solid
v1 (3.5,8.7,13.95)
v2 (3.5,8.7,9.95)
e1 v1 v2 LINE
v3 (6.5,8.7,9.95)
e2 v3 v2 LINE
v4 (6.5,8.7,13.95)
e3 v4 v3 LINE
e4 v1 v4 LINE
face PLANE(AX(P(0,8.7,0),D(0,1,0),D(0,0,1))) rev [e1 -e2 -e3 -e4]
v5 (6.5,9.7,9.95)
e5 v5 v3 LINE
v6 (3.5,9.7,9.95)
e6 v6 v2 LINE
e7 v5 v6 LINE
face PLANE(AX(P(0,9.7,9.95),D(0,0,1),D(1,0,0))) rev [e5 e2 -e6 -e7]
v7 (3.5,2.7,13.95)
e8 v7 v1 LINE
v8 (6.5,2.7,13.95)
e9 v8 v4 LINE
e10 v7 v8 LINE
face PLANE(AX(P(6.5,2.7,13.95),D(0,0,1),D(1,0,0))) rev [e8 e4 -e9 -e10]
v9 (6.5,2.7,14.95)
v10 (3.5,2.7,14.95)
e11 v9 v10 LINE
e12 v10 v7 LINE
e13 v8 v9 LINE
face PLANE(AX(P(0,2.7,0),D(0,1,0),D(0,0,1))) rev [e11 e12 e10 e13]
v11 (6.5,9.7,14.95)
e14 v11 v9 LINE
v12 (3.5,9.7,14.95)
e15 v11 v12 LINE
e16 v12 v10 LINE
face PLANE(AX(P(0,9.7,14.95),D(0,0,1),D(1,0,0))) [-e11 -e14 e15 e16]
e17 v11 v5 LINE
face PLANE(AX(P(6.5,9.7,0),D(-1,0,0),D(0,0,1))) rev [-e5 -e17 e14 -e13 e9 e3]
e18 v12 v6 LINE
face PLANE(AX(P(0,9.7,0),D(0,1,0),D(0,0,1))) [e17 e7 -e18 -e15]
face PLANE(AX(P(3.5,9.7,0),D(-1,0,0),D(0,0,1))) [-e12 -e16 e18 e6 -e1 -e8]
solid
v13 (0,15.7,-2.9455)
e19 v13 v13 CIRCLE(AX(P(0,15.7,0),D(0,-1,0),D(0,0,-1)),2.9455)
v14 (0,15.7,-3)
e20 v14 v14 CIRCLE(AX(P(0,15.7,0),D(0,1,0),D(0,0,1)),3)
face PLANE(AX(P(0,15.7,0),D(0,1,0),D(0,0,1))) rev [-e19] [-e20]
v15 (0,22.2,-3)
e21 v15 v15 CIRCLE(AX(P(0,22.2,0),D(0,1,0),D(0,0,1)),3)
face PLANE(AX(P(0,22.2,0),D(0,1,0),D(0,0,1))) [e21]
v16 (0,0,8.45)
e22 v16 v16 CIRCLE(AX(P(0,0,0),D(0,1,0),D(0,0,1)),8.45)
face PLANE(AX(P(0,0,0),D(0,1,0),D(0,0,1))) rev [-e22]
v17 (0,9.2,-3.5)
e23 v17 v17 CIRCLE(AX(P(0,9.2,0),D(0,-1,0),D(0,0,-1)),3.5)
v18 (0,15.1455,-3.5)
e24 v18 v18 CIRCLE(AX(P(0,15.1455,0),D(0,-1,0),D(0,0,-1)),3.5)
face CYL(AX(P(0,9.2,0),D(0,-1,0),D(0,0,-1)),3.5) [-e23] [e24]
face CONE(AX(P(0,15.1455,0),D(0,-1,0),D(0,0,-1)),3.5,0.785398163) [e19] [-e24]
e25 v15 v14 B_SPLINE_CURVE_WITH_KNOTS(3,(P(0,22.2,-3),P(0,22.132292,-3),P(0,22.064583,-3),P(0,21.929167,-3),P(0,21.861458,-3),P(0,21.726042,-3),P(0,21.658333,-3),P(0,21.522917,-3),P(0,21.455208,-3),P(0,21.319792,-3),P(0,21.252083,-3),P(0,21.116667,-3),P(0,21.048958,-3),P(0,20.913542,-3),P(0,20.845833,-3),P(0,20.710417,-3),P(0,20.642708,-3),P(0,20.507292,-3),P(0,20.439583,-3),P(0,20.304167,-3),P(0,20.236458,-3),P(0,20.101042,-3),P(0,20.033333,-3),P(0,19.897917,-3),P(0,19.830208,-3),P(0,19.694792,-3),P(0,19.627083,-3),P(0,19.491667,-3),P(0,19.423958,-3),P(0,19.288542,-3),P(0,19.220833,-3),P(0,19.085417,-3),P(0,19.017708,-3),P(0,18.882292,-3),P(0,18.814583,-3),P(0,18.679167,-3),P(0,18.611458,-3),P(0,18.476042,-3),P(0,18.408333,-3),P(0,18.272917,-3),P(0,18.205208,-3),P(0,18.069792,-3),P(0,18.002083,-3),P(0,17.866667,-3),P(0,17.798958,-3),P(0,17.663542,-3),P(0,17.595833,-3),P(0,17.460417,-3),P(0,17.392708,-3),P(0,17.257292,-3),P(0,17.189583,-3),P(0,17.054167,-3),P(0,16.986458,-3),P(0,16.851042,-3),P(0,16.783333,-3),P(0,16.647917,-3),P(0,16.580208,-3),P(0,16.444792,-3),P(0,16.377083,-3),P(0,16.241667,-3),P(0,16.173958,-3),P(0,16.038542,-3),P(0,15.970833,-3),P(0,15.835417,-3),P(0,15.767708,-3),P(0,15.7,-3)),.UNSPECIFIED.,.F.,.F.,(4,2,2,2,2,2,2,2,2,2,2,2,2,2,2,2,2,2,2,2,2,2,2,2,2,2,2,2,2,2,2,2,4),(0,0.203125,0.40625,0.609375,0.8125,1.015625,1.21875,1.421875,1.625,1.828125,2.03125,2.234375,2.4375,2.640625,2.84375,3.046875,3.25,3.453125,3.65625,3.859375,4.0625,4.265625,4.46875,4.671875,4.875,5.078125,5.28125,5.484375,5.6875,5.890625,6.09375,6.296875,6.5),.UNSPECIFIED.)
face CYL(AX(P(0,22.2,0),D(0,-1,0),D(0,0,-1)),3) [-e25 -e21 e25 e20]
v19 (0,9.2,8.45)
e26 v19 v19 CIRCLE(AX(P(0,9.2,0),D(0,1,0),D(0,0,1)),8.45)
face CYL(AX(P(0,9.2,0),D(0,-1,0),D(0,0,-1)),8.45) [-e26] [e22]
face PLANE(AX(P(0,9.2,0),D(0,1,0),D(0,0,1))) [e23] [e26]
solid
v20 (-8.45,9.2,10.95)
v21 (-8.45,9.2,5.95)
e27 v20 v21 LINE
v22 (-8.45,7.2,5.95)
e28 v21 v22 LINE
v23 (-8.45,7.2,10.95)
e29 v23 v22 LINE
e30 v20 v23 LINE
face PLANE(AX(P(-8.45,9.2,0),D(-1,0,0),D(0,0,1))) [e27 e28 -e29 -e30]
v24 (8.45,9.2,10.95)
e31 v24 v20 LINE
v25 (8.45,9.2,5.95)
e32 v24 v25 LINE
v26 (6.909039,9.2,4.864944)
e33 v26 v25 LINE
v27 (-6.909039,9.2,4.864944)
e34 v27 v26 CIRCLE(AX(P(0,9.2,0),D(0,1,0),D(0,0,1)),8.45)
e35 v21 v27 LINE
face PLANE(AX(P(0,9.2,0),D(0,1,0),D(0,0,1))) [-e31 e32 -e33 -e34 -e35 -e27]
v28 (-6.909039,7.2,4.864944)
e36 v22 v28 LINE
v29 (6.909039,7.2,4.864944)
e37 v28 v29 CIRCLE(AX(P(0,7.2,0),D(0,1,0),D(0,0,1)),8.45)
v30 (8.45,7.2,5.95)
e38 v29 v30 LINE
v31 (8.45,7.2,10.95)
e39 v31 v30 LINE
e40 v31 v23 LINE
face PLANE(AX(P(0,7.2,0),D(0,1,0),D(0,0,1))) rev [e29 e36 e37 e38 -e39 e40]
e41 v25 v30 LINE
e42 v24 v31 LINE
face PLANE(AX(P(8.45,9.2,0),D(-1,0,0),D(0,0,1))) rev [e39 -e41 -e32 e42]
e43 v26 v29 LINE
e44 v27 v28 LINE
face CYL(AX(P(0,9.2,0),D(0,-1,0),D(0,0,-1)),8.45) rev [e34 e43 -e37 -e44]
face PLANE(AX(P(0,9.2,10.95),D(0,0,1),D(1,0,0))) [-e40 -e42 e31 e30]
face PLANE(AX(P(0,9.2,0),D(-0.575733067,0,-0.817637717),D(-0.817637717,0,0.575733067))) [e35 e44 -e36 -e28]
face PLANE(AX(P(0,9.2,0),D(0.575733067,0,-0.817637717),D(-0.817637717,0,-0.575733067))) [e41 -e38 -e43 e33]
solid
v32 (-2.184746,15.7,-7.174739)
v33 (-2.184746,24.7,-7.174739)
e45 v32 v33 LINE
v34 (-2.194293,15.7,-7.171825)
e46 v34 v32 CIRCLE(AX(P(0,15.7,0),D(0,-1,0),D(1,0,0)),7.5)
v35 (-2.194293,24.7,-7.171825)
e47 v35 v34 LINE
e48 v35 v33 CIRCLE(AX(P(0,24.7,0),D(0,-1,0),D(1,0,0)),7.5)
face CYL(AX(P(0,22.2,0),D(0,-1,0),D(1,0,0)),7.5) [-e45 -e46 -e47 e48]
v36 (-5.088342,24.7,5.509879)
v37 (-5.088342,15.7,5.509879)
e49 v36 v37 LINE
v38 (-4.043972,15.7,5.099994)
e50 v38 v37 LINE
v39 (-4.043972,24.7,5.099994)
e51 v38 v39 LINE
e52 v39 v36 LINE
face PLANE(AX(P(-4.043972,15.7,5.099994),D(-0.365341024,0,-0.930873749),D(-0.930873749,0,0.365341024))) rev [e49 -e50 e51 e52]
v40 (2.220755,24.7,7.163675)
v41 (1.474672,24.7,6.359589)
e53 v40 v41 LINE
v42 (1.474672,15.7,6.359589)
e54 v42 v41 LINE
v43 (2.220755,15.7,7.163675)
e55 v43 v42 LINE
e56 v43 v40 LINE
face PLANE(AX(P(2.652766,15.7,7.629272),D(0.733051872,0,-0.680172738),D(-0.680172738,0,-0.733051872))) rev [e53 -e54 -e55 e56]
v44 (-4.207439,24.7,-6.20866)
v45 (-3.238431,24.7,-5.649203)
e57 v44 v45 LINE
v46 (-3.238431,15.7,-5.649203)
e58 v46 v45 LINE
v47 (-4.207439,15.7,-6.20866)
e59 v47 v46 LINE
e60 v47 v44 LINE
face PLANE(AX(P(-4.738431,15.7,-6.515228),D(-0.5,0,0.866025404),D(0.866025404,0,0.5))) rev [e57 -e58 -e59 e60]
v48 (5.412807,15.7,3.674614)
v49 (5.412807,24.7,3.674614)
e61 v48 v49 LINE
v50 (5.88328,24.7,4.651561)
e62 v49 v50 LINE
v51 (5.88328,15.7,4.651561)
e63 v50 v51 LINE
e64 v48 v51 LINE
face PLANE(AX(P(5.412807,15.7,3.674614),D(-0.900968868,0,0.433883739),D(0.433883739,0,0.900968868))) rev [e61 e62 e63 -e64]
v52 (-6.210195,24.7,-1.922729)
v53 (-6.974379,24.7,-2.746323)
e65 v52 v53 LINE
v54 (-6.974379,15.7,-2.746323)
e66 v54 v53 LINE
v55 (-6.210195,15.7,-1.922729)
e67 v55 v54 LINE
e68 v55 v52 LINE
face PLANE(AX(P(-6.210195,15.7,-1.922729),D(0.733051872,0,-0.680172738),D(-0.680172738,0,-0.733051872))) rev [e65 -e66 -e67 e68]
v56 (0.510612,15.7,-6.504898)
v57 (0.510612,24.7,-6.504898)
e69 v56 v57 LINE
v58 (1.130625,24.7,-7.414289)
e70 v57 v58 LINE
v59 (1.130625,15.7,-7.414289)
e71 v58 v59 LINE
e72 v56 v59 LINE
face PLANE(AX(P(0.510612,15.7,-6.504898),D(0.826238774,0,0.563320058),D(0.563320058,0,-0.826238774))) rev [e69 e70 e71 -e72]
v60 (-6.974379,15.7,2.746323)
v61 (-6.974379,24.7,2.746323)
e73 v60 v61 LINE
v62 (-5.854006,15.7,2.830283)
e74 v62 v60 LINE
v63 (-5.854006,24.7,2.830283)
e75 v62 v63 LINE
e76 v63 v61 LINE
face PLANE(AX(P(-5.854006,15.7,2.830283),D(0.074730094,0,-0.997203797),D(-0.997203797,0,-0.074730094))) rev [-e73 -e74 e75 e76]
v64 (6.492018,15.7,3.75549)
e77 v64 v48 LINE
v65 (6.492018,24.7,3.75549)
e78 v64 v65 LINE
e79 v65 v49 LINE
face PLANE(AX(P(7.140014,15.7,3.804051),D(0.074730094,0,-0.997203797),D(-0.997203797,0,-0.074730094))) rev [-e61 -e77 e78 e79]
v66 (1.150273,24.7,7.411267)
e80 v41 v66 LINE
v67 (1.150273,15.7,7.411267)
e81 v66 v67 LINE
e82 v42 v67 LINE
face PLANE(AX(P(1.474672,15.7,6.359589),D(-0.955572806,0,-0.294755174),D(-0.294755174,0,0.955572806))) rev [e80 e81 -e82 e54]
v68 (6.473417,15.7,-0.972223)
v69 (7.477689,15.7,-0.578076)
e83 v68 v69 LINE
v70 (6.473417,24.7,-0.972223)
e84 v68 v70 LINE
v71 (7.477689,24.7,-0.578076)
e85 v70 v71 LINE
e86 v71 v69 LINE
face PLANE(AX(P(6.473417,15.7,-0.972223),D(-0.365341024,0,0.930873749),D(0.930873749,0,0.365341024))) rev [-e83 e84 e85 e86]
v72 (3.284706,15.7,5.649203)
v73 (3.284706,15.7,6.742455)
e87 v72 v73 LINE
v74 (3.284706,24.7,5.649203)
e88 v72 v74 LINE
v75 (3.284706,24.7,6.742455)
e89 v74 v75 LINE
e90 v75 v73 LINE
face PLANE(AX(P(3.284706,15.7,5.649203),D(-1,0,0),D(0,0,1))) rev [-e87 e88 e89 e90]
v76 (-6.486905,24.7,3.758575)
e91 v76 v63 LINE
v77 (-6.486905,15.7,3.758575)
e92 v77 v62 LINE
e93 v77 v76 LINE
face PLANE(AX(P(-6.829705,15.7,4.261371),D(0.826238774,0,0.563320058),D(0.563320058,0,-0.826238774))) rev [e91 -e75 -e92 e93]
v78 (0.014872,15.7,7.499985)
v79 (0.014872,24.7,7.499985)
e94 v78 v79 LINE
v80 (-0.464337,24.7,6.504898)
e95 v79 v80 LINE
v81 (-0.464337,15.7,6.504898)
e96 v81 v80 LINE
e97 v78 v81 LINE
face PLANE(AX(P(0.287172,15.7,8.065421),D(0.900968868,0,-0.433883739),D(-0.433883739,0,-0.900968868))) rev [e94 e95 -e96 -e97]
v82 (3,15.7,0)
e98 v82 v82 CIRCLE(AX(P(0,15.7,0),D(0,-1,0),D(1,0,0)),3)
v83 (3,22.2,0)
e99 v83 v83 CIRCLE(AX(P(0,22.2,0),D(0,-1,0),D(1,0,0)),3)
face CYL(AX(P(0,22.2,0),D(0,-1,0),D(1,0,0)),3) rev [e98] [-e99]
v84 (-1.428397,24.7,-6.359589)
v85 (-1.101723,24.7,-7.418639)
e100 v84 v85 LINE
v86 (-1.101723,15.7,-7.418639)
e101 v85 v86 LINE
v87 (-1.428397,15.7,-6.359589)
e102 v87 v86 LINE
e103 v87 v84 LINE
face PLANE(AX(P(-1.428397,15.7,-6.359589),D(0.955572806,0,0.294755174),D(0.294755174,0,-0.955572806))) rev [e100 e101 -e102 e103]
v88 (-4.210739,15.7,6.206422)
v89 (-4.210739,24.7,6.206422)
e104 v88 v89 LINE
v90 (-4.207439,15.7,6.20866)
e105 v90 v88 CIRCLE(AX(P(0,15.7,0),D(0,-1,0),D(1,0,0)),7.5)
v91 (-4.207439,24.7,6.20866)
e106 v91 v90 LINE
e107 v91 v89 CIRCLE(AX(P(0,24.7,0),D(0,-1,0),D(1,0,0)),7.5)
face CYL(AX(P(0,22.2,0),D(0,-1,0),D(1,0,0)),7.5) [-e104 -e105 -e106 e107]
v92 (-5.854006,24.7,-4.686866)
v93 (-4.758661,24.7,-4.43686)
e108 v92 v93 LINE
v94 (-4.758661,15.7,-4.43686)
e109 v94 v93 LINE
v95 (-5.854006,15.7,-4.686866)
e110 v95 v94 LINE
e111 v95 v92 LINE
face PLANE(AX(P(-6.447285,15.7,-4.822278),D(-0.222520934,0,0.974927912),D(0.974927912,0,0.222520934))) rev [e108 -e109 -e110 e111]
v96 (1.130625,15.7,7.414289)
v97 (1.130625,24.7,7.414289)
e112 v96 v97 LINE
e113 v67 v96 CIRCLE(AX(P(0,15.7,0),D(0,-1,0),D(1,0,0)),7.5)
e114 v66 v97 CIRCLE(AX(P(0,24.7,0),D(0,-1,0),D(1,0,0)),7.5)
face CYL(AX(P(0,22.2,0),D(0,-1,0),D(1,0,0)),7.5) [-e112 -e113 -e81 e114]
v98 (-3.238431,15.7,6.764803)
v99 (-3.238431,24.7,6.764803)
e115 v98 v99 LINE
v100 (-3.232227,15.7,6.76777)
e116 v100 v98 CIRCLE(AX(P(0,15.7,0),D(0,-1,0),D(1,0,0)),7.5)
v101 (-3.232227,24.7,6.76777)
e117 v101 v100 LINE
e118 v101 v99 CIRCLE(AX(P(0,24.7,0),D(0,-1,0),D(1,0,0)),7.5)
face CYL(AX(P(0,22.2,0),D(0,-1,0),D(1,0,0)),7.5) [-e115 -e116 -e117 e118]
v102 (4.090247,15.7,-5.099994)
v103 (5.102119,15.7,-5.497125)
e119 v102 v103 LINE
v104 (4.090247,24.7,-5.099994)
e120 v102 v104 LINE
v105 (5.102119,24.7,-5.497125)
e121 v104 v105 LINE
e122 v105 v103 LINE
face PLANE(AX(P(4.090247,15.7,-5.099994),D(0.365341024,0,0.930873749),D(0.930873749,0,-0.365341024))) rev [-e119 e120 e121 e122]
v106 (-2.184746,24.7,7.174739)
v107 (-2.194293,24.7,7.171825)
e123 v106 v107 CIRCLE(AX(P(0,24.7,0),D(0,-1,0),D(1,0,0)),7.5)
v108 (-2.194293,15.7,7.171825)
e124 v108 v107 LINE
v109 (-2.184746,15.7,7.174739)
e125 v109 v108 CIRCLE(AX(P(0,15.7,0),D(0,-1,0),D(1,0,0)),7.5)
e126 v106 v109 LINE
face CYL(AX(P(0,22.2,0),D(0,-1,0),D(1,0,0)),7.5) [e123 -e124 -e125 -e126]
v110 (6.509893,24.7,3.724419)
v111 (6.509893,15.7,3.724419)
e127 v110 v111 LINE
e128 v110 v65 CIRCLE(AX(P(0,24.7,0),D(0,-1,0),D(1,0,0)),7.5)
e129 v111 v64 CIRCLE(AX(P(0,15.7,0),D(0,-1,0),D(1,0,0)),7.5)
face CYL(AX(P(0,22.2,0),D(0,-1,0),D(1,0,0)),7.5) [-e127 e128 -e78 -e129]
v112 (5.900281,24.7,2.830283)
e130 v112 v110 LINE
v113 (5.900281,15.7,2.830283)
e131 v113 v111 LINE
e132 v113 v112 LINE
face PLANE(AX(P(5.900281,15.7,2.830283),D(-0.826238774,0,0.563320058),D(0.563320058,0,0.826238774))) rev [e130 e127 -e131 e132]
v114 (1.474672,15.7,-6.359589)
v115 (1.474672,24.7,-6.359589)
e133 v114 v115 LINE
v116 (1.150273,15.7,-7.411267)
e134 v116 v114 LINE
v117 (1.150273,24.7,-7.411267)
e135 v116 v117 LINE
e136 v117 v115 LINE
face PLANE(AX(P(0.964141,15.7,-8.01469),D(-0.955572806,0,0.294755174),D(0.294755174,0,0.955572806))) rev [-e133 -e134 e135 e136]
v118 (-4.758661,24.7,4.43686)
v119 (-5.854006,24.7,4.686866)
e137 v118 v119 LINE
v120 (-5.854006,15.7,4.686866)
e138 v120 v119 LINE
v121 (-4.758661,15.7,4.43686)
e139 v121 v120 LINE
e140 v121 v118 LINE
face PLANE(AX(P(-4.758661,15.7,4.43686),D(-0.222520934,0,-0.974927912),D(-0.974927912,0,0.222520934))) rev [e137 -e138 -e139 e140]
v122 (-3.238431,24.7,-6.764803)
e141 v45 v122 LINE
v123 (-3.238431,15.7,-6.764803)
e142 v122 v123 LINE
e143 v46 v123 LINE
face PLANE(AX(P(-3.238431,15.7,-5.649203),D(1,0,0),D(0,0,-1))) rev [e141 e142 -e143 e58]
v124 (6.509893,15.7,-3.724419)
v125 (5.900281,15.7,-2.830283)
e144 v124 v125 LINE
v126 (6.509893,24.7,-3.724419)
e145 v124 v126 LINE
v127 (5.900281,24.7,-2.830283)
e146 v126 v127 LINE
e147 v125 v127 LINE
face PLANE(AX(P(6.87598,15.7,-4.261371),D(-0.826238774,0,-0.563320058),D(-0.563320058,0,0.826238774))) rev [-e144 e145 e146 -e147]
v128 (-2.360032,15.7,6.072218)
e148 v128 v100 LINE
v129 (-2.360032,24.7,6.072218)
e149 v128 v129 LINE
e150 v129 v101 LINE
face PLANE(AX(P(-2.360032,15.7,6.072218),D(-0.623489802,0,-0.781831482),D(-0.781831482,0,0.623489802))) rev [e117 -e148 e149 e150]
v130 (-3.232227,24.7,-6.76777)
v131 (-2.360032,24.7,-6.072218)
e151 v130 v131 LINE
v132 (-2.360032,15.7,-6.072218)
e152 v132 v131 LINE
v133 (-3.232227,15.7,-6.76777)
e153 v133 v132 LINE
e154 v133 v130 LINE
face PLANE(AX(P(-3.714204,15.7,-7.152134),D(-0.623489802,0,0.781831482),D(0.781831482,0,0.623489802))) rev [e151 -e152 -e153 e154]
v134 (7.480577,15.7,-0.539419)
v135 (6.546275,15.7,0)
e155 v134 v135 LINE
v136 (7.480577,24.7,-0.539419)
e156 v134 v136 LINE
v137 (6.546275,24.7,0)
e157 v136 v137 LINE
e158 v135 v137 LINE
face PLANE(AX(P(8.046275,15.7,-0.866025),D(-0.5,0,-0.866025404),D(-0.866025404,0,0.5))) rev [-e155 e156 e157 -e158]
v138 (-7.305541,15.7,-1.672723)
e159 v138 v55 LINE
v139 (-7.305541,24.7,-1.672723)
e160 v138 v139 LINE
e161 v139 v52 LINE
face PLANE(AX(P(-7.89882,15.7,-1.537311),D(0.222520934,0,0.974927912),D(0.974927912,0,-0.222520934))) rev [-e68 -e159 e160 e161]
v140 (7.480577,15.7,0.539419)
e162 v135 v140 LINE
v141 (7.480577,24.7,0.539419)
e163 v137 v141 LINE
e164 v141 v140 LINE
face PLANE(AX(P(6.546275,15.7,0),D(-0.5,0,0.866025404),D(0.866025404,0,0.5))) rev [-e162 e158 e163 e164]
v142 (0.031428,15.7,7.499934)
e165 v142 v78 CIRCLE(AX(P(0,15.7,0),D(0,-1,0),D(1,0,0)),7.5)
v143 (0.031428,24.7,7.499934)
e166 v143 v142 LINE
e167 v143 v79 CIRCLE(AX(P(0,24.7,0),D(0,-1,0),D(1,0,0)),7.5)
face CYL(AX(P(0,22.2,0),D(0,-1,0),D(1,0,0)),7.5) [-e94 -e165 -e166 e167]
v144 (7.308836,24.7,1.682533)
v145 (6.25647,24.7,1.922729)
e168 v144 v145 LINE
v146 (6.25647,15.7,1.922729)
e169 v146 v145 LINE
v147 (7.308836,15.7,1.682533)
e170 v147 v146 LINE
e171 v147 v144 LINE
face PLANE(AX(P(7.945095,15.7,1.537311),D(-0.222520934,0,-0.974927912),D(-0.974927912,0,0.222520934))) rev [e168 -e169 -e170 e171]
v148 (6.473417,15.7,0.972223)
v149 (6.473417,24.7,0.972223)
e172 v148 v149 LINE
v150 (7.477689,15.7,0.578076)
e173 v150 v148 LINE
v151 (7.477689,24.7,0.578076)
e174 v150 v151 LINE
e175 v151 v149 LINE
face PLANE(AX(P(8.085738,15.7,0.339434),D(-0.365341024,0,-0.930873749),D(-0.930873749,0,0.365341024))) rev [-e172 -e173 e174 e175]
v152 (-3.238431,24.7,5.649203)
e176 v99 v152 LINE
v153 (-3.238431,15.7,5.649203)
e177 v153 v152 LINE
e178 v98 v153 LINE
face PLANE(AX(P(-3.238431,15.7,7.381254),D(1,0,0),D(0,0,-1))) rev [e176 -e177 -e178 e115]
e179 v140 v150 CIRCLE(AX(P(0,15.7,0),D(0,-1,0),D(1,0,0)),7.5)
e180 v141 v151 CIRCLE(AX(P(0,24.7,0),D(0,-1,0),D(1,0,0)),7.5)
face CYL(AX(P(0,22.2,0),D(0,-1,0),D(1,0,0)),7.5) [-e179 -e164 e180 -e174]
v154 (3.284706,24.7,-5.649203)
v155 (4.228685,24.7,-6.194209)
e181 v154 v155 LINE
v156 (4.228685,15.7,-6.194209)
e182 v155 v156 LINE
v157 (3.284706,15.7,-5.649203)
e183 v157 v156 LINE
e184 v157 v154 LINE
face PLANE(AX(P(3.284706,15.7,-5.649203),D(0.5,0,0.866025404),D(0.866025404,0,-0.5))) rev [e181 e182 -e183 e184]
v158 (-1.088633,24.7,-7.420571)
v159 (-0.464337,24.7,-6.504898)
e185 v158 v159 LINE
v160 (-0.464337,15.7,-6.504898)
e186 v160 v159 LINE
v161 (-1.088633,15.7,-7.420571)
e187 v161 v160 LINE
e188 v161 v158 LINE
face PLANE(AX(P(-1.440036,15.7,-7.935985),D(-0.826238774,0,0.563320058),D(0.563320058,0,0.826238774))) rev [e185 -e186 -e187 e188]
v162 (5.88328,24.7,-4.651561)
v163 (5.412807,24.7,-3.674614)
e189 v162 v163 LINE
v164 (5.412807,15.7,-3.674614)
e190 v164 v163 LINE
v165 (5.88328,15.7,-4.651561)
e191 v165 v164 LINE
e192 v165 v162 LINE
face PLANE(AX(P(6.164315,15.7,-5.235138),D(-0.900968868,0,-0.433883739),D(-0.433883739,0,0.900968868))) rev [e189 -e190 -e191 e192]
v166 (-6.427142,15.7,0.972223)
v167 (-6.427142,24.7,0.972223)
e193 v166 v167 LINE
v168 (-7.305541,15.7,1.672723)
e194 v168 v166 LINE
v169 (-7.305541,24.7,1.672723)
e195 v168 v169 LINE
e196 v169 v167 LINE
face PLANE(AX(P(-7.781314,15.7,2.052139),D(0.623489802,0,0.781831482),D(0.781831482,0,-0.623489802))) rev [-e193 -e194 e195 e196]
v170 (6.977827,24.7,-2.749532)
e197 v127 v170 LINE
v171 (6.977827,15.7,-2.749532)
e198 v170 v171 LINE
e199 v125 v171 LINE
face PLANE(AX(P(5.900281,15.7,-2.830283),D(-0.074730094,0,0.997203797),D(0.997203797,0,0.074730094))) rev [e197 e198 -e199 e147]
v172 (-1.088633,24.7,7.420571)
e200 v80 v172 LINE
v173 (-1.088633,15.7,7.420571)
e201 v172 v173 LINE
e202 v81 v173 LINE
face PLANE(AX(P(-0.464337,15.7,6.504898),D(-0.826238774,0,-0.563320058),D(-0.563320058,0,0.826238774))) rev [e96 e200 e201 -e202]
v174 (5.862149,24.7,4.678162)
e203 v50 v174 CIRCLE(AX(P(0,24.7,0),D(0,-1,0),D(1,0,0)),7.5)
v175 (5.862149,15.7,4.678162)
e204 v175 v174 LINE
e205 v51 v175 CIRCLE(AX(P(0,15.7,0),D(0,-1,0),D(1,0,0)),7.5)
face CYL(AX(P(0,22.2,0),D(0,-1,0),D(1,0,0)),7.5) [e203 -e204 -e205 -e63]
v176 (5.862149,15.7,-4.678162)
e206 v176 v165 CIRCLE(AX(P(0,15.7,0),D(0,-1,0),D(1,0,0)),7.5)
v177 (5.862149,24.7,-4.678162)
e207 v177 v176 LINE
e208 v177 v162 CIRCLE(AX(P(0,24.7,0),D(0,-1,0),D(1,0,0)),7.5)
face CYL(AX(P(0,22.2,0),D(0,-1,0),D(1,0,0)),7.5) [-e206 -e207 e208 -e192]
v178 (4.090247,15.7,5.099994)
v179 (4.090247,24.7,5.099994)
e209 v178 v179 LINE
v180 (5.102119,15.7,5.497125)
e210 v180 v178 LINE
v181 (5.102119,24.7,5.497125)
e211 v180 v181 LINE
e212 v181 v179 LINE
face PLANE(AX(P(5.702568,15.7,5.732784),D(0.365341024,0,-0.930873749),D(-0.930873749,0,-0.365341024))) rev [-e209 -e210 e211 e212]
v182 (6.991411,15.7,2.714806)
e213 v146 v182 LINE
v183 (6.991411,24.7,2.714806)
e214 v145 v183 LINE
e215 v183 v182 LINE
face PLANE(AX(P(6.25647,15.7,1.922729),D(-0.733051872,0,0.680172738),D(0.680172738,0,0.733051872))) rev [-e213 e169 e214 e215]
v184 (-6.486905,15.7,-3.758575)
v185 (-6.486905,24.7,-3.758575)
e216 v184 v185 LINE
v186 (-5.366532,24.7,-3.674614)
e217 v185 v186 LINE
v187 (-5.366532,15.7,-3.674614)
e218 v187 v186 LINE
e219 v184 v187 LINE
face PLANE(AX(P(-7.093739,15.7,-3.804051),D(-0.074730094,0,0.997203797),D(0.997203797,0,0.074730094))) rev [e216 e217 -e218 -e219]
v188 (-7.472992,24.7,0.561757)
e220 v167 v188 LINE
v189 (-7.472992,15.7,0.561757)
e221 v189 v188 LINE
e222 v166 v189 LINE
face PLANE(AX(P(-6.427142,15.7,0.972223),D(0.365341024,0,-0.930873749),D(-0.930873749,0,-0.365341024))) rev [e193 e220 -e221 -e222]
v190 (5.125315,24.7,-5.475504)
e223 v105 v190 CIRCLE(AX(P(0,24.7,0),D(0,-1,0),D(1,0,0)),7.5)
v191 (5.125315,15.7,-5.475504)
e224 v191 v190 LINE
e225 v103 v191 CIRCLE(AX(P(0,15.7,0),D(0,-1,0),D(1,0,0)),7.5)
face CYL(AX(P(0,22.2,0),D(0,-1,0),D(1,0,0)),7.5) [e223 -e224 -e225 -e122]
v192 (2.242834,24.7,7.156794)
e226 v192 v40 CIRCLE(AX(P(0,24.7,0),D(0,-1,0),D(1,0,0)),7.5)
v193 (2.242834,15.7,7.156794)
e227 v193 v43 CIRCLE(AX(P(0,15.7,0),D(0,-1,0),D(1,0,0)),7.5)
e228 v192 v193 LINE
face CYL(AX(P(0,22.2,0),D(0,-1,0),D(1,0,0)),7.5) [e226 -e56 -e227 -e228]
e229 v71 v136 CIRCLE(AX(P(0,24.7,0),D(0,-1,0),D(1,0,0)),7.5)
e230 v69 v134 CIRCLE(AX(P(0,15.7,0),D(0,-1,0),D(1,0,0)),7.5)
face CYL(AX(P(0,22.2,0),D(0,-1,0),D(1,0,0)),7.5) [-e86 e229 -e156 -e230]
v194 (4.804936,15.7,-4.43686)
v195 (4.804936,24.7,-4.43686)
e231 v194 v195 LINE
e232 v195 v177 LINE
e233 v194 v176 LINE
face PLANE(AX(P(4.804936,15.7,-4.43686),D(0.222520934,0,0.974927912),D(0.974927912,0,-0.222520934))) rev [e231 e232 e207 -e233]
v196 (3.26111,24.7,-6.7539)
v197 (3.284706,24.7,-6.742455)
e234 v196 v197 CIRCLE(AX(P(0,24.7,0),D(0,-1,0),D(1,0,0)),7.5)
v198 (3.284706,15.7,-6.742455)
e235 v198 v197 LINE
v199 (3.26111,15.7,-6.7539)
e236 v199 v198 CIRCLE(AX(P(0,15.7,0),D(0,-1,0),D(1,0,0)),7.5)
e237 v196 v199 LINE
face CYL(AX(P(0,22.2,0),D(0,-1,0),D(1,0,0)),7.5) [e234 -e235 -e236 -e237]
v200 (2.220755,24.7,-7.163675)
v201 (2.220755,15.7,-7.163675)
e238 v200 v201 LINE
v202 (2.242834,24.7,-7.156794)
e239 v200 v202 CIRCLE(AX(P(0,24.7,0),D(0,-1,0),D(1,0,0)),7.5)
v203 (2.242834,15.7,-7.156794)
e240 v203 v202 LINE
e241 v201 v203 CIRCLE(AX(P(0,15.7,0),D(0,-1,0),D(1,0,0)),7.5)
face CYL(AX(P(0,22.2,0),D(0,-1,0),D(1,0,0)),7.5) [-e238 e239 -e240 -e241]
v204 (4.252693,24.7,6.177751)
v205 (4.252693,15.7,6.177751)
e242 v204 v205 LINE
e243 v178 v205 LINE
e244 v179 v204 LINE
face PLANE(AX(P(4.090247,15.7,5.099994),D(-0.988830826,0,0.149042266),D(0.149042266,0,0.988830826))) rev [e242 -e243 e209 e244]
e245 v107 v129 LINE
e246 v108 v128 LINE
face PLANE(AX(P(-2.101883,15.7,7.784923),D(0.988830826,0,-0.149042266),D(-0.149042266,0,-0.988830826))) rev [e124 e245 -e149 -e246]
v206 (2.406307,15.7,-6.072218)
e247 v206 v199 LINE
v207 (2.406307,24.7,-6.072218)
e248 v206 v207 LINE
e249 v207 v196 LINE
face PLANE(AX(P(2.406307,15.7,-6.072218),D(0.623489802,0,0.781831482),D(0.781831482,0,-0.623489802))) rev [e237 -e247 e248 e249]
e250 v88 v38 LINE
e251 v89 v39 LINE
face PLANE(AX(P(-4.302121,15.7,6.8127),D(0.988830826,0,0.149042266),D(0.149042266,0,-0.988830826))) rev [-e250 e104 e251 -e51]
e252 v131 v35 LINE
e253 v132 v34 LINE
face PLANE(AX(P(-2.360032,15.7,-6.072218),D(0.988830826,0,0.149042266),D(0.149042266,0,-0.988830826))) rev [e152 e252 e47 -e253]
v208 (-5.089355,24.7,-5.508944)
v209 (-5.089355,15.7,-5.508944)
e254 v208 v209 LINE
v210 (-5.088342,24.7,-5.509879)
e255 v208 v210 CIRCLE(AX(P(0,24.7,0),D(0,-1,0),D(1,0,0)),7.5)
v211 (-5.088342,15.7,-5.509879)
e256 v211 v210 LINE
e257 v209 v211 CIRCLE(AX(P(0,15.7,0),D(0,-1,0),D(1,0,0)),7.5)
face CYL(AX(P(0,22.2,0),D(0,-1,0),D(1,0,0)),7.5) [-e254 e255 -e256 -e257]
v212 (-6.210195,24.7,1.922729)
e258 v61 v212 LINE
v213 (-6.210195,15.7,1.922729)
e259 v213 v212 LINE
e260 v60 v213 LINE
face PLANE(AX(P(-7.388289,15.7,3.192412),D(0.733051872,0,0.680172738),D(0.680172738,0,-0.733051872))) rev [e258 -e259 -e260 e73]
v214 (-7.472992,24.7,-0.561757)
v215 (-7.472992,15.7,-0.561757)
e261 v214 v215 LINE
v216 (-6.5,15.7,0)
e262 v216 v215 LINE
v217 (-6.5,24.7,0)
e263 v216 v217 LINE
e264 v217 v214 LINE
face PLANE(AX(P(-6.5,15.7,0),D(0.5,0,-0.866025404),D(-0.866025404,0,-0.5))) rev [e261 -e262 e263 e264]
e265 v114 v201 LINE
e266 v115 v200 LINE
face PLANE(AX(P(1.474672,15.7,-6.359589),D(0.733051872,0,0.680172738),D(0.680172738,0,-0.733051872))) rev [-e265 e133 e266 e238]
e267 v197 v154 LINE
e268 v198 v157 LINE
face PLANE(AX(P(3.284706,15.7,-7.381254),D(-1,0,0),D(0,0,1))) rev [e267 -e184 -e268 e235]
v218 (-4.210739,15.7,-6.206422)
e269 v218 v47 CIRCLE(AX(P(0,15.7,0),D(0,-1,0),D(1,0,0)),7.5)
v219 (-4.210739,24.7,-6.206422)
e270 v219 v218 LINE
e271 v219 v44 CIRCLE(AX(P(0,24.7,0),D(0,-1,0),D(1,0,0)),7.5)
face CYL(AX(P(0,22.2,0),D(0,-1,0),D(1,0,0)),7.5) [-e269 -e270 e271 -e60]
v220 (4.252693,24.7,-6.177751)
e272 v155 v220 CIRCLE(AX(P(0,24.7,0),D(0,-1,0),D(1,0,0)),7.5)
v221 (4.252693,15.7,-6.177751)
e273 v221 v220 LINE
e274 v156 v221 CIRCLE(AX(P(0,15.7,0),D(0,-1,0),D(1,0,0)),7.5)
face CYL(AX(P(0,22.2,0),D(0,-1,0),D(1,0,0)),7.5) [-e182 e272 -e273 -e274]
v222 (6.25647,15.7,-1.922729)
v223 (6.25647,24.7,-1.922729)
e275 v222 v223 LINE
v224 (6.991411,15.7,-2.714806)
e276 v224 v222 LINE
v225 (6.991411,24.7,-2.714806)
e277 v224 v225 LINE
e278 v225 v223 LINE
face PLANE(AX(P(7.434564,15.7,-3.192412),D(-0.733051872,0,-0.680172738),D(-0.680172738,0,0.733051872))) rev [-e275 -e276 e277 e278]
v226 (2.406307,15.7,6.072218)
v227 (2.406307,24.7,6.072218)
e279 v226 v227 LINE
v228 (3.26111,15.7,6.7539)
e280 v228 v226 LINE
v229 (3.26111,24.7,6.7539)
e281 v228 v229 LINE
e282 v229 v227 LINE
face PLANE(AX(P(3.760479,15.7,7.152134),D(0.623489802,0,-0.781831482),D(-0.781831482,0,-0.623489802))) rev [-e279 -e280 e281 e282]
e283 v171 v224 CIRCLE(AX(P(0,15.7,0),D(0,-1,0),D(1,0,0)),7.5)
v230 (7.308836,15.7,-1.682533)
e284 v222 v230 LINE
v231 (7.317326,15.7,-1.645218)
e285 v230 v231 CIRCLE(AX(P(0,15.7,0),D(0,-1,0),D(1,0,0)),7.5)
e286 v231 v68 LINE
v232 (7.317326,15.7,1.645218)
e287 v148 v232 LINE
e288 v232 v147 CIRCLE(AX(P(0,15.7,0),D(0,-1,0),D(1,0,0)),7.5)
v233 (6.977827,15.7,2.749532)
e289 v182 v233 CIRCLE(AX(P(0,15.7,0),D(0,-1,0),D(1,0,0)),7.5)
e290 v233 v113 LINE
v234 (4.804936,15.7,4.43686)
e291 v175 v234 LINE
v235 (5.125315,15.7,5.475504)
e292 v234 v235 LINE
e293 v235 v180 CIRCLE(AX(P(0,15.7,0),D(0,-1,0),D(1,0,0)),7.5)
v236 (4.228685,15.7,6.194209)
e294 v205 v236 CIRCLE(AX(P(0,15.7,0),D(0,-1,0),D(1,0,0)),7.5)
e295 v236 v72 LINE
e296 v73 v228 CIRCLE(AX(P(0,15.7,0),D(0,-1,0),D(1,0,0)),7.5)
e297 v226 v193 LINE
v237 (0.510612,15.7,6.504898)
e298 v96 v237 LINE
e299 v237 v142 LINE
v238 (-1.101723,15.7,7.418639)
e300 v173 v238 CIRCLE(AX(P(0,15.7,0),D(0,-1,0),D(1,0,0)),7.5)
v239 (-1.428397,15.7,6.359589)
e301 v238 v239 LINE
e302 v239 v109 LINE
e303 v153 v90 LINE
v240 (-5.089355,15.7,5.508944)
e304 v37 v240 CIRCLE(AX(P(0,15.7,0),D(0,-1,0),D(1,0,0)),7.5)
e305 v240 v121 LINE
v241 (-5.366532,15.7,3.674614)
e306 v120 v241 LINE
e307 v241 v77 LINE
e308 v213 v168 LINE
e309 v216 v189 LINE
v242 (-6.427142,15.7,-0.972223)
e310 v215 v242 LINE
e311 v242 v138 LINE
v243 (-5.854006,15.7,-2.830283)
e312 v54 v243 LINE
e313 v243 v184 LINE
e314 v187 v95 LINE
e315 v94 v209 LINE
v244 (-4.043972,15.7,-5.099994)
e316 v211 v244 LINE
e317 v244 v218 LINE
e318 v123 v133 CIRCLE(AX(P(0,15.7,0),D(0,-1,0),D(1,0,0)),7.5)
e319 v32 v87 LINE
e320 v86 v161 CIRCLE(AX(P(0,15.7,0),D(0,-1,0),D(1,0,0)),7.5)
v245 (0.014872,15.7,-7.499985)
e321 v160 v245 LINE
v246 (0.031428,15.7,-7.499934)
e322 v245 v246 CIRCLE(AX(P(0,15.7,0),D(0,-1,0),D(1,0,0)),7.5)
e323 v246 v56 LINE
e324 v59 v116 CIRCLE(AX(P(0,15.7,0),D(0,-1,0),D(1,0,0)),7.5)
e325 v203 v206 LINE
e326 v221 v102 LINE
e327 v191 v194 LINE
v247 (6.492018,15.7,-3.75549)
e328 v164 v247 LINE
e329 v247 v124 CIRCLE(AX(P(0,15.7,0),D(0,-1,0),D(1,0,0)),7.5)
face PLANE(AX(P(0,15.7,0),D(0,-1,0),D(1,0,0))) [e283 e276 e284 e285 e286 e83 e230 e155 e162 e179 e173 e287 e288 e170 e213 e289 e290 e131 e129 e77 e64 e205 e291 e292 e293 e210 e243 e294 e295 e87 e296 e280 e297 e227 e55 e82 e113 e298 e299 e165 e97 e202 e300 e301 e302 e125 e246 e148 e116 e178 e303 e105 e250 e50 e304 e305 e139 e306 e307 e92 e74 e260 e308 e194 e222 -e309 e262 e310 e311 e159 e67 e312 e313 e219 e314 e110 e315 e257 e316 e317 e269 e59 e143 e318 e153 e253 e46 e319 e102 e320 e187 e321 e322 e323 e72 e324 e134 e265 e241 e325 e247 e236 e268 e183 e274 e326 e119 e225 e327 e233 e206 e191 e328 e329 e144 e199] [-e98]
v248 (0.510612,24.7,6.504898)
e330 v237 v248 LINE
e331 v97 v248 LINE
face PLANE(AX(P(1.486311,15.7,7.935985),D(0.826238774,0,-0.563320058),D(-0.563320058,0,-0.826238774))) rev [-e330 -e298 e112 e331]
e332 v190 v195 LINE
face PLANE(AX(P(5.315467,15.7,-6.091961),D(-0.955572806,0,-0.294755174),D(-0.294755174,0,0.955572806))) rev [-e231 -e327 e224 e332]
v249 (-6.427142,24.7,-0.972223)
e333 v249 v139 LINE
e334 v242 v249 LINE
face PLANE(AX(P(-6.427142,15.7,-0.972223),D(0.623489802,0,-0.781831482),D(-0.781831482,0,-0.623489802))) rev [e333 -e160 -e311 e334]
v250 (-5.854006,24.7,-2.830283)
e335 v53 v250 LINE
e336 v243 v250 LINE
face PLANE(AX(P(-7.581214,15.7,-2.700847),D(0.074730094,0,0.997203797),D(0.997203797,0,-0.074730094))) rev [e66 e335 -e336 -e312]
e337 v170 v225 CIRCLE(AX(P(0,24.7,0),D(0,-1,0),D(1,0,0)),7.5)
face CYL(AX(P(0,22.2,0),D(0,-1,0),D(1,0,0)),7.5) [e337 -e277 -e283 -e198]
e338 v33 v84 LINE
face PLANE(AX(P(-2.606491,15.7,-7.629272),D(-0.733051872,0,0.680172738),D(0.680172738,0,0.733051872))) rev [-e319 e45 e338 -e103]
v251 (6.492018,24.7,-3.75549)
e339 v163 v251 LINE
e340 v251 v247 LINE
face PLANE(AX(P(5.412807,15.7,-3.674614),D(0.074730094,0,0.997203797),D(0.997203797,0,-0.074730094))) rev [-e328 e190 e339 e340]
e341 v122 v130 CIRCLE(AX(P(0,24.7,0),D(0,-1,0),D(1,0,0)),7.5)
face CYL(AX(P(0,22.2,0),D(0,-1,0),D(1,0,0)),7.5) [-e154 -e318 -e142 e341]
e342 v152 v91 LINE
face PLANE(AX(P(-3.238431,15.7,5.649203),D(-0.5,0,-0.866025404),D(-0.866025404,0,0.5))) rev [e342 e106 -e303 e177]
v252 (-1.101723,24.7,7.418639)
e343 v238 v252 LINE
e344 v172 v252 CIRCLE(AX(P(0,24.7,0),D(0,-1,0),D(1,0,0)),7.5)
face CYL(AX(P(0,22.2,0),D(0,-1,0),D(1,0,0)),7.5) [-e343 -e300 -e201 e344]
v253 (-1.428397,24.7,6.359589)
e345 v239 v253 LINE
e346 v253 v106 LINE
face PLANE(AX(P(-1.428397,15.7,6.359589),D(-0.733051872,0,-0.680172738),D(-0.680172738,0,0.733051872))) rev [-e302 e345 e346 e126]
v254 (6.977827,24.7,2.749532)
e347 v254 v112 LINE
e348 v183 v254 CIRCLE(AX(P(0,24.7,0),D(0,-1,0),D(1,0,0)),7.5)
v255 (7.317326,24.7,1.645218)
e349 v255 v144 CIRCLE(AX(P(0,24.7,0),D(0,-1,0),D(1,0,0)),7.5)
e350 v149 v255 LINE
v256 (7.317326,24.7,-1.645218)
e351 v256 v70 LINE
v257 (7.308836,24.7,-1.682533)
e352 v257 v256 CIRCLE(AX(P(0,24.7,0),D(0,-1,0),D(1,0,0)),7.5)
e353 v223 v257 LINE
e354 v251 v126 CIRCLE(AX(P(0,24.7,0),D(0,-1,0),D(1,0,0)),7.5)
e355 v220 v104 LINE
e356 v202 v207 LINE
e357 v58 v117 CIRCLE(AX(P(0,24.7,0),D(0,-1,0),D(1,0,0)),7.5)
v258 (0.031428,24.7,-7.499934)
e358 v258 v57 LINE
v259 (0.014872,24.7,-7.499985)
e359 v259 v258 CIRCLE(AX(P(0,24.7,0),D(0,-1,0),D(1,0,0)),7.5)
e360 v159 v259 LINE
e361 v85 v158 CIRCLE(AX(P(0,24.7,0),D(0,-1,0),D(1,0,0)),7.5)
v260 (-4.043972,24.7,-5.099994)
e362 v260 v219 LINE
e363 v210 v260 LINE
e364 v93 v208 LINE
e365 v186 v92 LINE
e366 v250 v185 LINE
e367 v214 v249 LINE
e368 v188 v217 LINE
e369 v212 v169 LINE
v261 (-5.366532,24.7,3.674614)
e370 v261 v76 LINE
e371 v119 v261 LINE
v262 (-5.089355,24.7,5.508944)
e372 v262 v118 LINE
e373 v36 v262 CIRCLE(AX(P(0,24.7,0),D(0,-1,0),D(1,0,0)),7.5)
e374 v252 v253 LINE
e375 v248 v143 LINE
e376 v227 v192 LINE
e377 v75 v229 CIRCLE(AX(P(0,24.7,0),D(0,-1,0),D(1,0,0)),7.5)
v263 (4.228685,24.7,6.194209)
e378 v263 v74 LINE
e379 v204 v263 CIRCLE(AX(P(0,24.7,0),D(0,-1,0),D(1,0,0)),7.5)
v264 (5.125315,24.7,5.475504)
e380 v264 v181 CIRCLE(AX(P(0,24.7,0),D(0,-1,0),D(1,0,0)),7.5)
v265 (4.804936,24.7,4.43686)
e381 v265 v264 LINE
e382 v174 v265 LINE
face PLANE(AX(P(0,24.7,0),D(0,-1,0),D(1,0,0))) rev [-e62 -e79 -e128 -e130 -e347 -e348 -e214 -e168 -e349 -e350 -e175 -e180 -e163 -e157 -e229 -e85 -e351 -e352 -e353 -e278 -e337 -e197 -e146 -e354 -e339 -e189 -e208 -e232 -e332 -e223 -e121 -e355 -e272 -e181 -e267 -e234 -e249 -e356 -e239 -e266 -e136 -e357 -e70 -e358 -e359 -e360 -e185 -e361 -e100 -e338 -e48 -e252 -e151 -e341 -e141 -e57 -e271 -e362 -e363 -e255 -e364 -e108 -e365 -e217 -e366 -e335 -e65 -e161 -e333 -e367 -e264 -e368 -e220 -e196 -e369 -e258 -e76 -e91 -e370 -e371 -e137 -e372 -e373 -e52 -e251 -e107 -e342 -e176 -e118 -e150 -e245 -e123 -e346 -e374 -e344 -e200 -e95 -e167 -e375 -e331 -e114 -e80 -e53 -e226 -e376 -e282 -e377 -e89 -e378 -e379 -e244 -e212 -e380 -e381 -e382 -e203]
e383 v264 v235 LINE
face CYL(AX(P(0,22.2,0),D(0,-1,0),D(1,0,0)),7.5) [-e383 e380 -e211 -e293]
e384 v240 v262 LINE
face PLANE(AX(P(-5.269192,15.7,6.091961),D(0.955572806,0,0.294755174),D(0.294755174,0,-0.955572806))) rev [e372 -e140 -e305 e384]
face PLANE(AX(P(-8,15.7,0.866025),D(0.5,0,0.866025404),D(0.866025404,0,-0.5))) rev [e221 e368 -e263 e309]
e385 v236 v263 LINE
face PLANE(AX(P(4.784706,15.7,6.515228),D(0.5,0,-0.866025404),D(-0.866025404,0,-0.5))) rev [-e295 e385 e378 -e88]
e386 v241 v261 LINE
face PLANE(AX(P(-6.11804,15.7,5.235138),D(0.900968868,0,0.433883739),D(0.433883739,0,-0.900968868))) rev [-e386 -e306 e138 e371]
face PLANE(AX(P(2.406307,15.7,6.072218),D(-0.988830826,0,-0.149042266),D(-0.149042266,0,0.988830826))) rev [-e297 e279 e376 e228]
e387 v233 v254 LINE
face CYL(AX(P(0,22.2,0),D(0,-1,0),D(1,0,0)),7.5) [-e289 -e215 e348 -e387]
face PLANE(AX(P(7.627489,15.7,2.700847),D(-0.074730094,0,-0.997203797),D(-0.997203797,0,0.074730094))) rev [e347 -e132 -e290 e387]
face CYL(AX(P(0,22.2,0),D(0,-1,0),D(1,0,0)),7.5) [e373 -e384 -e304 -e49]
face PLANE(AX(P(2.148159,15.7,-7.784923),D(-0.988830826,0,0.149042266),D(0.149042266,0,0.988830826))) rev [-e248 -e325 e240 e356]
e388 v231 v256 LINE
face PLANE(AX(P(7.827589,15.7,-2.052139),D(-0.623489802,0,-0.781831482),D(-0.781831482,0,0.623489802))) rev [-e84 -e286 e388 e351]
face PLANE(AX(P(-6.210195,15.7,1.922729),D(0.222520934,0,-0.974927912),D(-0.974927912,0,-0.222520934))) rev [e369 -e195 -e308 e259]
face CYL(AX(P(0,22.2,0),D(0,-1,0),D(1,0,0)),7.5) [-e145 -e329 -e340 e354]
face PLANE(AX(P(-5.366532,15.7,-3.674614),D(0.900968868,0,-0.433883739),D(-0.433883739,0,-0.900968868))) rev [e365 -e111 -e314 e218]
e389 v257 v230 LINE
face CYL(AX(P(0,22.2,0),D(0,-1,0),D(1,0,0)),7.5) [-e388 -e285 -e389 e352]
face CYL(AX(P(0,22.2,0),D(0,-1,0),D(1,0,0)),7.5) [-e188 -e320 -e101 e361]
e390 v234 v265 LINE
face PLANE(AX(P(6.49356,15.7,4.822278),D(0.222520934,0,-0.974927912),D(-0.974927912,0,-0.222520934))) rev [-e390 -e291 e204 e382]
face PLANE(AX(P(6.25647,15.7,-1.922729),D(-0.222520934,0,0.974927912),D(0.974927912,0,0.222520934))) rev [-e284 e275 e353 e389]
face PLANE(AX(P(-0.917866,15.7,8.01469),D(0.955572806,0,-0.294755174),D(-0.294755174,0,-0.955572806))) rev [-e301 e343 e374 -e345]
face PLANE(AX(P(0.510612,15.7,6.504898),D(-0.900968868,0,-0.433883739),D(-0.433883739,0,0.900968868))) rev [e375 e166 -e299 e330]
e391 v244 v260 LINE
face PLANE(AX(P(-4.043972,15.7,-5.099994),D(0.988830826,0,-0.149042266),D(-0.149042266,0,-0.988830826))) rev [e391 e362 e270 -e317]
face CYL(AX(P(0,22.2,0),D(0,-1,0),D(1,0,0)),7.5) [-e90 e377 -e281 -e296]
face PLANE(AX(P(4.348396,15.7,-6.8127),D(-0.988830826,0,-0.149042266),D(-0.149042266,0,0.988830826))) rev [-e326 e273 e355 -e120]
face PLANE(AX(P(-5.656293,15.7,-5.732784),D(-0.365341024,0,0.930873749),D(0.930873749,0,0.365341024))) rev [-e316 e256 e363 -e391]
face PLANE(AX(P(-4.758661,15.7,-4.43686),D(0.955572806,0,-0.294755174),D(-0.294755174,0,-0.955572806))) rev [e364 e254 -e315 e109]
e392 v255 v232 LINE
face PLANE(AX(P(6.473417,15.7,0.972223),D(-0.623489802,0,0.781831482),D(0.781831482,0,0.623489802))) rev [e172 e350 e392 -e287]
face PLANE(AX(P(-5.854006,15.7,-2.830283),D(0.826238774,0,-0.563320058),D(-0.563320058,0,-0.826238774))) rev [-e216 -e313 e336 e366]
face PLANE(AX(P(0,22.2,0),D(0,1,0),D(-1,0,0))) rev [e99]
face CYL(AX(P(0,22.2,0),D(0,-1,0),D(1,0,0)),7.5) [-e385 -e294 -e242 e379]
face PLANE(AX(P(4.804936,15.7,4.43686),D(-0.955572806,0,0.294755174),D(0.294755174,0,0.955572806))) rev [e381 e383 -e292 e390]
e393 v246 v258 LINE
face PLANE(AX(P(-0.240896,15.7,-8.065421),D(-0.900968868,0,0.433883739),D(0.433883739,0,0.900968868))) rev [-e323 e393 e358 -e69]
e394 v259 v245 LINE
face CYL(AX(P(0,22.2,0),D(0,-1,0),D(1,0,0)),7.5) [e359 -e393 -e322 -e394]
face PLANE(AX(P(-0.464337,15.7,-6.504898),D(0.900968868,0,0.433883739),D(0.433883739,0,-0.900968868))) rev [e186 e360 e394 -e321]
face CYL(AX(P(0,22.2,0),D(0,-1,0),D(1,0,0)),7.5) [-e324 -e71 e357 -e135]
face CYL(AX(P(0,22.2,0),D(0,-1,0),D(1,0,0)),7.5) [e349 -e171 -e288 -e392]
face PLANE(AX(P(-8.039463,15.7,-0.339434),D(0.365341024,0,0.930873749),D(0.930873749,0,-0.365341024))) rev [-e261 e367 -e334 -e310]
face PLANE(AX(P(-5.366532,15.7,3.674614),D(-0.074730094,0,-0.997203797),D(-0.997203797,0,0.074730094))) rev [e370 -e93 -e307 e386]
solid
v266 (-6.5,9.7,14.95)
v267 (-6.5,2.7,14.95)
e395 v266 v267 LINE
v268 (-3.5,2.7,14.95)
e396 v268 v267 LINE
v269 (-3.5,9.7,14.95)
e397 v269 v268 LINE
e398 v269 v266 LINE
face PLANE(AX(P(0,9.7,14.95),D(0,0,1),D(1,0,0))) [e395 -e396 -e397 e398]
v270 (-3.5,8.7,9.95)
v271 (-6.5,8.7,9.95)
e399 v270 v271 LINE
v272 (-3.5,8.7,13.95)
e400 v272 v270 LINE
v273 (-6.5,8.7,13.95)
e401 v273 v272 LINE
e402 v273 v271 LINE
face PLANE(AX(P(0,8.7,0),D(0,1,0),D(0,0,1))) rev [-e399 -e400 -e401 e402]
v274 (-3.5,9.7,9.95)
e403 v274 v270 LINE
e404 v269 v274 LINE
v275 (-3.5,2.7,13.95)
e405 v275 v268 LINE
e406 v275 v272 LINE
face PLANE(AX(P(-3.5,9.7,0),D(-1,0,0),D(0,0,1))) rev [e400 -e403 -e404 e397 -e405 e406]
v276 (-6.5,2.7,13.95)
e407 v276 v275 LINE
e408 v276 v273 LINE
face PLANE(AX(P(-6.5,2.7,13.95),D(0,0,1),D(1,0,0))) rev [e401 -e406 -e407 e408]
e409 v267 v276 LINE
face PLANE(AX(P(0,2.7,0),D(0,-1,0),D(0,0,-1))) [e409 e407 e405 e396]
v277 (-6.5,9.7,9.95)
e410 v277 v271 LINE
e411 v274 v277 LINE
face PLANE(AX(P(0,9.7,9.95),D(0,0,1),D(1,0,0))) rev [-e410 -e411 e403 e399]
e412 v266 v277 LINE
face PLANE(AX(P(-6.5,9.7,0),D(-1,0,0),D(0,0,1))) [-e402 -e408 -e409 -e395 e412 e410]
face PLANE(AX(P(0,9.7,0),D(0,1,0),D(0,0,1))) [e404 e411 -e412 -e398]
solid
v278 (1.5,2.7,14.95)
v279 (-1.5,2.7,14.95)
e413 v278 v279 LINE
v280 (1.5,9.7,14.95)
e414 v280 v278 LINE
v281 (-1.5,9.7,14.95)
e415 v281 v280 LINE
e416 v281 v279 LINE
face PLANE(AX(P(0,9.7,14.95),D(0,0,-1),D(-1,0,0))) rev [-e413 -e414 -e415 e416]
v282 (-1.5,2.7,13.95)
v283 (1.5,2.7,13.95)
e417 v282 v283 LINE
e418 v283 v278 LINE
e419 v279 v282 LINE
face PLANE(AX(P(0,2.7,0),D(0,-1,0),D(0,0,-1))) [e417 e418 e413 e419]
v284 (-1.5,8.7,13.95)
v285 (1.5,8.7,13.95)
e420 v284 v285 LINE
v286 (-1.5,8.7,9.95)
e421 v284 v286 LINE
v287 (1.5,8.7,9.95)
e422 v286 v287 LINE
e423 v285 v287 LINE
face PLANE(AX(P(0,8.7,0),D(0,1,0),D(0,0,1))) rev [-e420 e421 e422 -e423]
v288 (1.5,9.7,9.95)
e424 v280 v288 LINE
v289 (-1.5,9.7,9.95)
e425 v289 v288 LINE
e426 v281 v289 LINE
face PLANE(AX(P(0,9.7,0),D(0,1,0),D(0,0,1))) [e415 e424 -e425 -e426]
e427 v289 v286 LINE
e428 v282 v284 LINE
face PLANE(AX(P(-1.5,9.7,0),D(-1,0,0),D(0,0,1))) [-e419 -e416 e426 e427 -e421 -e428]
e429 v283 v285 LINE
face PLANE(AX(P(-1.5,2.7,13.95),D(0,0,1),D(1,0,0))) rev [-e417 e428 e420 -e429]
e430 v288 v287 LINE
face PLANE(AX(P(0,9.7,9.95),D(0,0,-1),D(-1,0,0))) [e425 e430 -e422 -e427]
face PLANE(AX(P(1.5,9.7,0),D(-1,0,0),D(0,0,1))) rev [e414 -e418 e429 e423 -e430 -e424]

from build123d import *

# Parameters (mm, degrees)
SKETCH1_R           = 8.45
BOSS_EXTRUDE1_DEPTH = 9.2
BOSS_EXTRUDE2_START = 7.2
SKETCH1_3_W         = 3
SKETCH1_3_H         = 1
BOSS_EXTRUDE2_DEPTH = 2
BOSS_EXTRUDE3_START = 8.7
SKETCH1_4_W         = 3
SKETCH1_4_H         = 1
SKETCH1_4_H_2       = 4
BOSS_EXTRUDE3_DEPTH = 1
SKETCH5_R           = 3
BOSS_EXTRUDE4_DEPTH = 6.5
SKETCH6_W           = 3
SKETCH6_H           = 1
BOSS_EXTRUDE5_DEPTH = 6
CUT_EXTRUDE2_DEPTH  = 9
CIRPATTERN2_COUNT   = 42


# Read off the part's stored shape, not the designer's step: M7x1.0 Machine Threads Stud1
with BuildPart() as part:
    # Sketch1 → Boss-Extrude1 (new body)
    with BuildSketch(Plane(origin=(0, 0, 0), x_dir=(1, 0, 0), z_dir=(0, 1, 0))):
        with Locations(Location((0, 0, 0), (0, 0, 270))):
            Circle(SKETCH1_R)
    extrude(amount=BOSS_EXTRUDE1_DEPTH)

    # M7x1.0 Machine Threads Stud1 outline → M7x1.0 Machine Threads Stud1 (revolve)
    with BuildSketch(Plane.XY):
        Polygon((2.9455, 15.7), (0, 15.7), (0, 9.2), (3.5, 9.2), (3.5, 15.1455), align=None)
    revolve(axis=Axis((0, 0, 0), (0, 1, 0)))

    # Sketch5 → Boss-Extrude4 (add)
    with BuildSketch(Plane(origin=(0, 15.7, 0), x_dir=(1, 0, 0), z_dir=(0, 1, 0))):
        with Locations(Location((0, 0, 0), (0, 0, 90))):
            Circle(SKETCH5_R)
    extrude(amount=BOSS_EXTRUDE4_DEPTH)


with BuildPart() as body_2:
    # Sketch1<3> → Boss-Extrude2 (new body)
    with BuildSketch(Plane(origin=(0, 0, 0), x_dir=(1, 0, 0), z_dir=(0, 1, 0)).offset(BOSS_EXTRUDE2_START)):
        with BuildLine():
            Line((-6.909038706, -4.864944414), (-8.45, -5.95))
            Line((-8.45, -5.95), (-6, -5.95))
            ThreePointArc((-6, -5.95), (-6.477280022, -5.426540658), (-6.909038706, -4.864944414))
        make_face()
        with BuildLine():
            Line((-6, -5.95), (-8.45, -5.95))
            Line((-8.45, -5.95), (-8.45, -10.95))
            Line((-8.45, -10.95), (-6.5, -10.95))
            Line((-6.5, -10.95), (-6.5, -9.95))
            Line((-6.5, -9.95), (-3.5, -9.95))
            Line((-3.5, -9.95), (-3.5, -10.95))
            Line((-3.5, -10.95), (-1.5, -10.95))
            Line((-1.5, -10.95), (-1.5, -9.95))
            Line((-1.5, -9.95), (1.5, -9.95))
            Line((1.5, -9.95), (1.5, -10.95))
            Line((1.5, -10.95), (3.5, -10.95))
            Line((3.5, -10.95), (3.5, -9.95))
            Line((3.5, -9.95), (6.5, -9.95))
            Line((6.5, -9.95), (6.5, -10.95))
            Line((6.5, -10.95), (8.45, -10.95))
            Line((8.45, -10.95), (8.45, -5.95))
            Line((8.45, -5.95), (6, -5.95))
            ThreePointArc((6, -5.95), (0, -8.45), (-6, -5.95))
        make_face()
        with BuildLine():
            ThreePointArc((6.909038706, -4.864944414), (6.477280022, -5.426540658), (6, -5.95))
            Line((6, -5.95), (8.45, -5.95))
            Line((8.45, -5.95), (6.909038706, -4.864944414))
        make_face()
        with Locations((-5, -10.45)):
            Rectangle(SKETCH1_3_W, SKETCH1_3_H)
        with Locations((0, -10.45)):
            Rectangle(SKETCH1_3_W, SKETCH1_3_H)
        with Locations((5, -10.45)):
            Rectangle(SKETCH1_3_W, SKETCH1_3_H)
    extrude(amount=BOSS_EXTRUDE2_DEPTH)


with BuildPart() as body_3:
    # Sketch1<4> → Boss-Extrude3 (new body)
    with BuildSketch(Plane(origin=(0, 0, 0), x_dir=(1, 0, 0), z_dir=(0, 1, 0)).offset(BOSS_EXTRUDE3_START)):
        with Locations((-5, -10.45)):
            Rectangle(SKETCH1_4_W, SKETCH1_4_H)
        with Locations((-5, -12.95)):
            Rectangle(SKETCH1_4_W, SKETCH1_4_H_2)
        with Locations((0, -10.45)):
            Rectangle(SKETCH1_4_W, SKETCH1_4_H)
        with Locations((0, -12.95)):
            Rectangle(SKETCH1_4_W, SKETCH1_4_H_2)
        with Locations((5, -10.45)):
            Rectangle(SKETCH1_4_W, SKETCH1_4_H)
        with Locations((5, -12.95)):
            Rectangle(SKETCH1_4_W, SKETCH1_4_H_2)
    extrude(amount=BOSS_EXTRUDE3_DEPTH)

    # Sketch6 → Boss-Extrude5 (add)
    with BuildSketch(Plane.XZ.offset(-8.7)):
        with Locations((-5, 14.45)):
            Rectangle(SKETCH6_W, SKETCH6_H)
        with Locations((0, 14.45)):
            Rectangle(SKETCH6_W, SKETCH6_H)
        with Locations((5, 14.45)):
            Rectangle(SKETCH6_W, SKETCH6_H)
    extrude(amount=BOSS_EXTRUDE5_DEPTH)


with BuildPart() as body_4:
    # Sketch8 → Revolve1 (revolve)
    with BuildSketch(Plane.XY, mode=Mode.PRIVATE) as revolve1_sk:
        Polygon((-7.5, 15.7), (-3, 15.7), (-3, 22.2), (0, 22.2), (0, 24.7), (-7.5, 24.7), align=None)
    revolve(revolve1_sk.sketch.rotate(Axis((0, 22.2, 0), (0, 1, 0)), 180), axis=Axis((0, 22.2, 0), (0, 1, 0)))

    # Sketch9 → Cut-Extrude2 (cut)
    with BuildSketch(Plane(origin=(0, 24.7, 0), x_dir=(1, 0, 0), z_dir=(0, 1, 0))):
        Polygon((-6.5, 0), (-8, 0.866025404), (-8, -0.866025404), align=None)
    cut_extrude2 = extrude(amount=-CUT_EXTRUDE2_DEPTH, mode=Mode.SUBTRACT)

    # CirPattern2: Cut-Extrude2 ×42 about axis
    cirpattern2_axis = Axis((0.023137555, 0, 0), (0, 1, 0))
    for i in range(1, CIRPATTERN2_COUNT):
        add(cut_extrude2.rotate(cirpattern2_axis, i * 360 / CIRPATTERN2_COUNT), mode=Mode.SUBTRACT)


solid = Compound([part.part, body_2.part, body_3.part, body_4.part])
